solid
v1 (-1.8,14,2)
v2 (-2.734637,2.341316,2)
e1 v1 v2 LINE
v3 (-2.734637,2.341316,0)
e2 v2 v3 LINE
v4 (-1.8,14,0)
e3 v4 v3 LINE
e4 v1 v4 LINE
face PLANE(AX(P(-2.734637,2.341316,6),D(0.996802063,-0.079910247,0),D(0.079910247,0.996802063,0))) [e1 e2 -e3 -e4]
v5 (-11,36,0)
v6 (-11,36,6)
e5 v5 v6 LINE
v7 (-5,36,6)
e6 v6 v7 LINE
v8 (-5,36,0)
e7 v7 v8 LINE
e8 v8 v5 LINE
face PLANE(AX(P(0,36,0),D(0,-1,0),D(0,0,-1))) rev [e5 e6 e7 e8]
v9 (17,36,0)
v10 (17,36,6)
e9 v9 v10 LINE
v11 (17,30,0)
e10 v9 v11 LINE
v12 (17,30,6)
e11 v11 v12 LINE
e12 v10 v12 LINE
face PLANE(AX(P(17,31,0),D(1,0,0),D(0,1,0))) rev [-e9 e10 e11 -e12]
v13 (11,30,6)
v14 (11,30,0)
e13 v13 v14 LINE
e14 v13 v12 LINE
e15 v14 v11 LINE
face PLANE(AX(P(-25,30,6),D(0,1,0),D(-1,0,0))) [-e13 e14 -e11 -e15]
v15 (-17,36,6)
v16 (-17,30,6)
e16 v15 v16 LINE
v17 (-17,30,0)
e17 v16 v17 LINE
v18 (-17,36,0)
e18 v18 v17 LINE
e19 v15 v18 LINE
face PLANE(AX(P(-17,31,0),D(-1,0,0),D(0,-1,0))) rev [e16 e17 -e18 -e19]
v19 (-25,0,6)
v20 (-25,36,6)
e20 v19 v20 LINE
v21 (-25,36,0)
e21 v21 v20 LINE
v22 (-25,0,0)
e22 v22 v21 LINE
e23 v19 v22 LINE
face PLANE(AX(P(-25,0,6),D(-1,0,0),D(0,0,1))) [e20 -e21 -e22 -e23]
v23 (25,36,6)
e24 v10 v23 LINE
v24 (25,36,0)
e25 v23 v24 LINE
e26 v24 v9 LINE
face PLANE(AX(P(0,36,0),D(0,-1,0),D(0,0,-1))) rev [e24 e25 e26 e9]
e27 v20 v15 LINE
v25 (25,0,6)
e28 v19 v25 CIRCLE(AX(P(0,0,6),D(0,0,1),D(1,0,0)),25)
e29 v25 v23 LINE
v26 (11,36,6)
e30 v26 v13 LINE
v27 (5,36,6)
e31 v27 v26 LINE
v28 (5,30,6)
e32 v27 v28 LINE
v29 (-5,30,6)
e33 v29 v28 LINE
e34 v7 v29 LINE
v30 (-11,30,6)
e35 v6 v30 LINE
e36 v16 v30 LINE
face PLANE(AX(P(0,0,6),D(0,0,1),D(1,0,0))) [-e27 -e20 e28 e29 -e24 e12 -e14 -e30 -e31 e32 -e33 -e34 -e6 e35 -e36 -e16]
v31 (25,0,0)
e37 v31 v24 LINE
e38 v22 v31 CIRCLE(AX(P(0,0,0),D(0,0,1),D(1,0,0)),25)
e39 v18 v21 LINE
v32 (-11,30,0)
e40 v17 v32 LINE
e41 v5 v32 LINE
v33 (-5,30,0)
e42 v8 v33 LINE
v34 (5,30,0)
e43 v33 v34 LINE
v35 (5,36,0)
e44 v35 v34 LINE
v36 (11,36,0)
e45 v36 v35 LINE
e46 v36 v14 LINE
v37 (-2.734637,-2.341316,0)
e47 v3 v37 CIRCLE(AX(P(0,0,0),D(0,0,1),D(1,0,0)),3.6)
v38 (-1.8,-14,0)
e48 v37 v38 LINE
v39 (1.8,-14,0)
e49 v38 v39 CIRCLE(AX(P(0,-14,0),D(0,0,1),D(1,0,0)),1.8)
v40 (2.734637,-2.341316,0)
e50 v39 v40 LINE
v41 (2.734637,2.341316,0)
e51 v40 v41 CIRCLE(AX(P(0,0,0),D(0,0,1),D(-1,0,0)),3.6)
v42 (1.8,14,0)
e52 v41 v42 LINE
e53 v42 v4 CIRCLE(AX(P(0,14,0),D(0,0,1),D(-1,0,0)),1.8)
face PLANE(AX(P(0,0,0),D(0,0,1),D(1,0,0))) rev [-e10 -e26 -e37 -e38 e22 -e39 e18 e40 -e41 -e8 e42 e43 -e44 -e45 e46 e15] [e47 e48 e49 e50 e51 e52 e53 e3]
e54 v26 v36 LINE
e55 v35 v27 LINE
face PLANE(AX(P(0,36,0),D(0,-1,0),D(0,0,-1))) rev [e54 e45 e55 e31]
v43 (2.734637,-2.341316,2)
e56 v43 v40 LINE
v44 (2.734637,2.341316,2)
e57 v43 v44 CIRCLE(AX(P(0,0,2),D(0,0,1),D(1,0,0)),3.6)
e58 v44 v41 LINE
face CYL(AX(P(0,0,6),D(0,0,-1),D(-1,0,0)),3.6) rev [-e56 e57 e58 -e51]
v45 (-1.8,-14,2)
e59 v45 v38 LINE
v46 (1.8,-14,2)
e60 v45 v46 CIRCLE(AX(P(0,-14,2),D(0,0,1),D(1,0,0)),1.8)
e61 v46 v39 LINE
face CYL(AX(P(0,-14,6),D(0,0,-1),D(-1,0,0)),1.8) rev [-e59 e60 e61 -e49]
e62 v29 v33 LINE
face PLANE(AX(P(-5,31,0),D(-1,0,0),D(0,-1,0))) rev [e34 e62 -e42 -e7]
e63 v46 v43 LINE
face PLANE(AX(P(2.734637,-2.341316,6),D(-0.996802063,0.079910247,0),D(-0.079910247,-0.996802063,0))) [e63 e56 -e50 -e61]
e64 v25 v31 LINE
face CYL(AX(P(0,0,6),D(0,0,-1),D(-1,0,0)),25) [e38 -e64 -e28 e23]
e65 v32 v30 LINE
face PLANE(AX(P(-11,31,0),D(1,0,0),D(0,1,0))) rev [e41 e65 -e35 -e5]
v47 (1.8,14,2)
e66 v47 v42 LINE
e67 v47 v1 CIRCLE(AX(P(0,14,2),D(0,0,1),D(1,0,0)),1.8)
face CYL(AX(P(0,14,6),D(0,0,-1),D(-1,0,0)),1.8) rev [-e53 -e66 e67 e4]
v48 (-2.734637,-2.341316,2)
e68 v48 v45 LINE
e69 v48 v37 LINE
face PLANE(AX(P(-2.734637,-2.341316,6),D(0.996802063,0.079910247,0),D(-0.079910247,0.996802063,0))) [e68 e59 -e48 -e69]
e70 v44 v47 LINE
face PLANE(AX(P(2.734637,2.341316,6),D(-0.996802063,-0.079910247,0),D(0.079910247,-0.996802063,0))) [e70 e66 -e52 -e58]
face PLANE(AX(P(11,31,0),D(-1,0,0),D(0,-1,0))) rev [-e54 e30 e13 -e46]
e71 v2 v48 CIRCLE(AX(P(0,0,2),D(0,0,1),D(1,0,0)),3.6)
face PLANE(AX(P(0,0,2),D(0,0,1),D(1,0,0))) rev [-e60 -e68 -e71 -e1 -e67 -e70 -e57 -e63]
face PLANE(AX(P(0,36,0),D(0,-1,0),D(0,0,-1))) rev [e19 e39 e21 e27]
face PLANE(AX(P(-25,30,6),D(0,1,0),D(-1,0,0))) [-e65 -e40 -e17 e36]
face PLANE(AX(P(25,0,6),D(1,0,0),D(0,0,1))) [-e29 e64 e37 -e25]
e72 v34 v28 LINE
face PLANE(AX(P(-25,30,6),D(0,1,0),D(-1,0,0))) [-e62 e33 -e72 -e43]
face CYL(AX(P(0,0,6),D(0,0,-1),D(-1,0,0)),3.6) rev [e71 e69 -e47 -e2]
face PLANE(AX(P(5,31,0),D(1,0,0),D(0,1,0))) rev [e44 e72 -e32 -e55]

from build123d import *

# Parameters (mm, degrees)
SKETCH2_R                = 25
BOSS_EXTRUDE1_DEPTH      = 6
BOSS_EXTRUDE2_START      = -4
BOSS_EXTRUDE2_DEPTH      = 4
BOSS_EXTRUDE4_DEPTH      = 6
SKETCH5_W                = 8
SKETCH5_H                = 6
SKETCH5_W_2              = 6
BOSS_EXTRUDE5_DEPTH      = 6
MOVE_START               = 31
MOVE_FACE1_OUTLINE_W     = 8
MOVE_FACE1_OUTLINE_H     = 6
MOVE_FACE1_OUTLINE_W_2   = 6
MOVE_FACE1_DEPTH         = 5
MOVE_START_2             = 25
MOVE_FACE1_2_OUTLINE_W   = 6
MOVE_FACE1_2_OUTLINE_H   = 6
MOVE_FACE1_2_OUTLINE_W_2 = 10
MOVE_FACE1_2_DEPTH       = 5


# Read off the part's stored shape, not the designer's step: Move Face1
with BuildPart() as part:
    # Sketch2 → Boss-Extrude1 (new body)
    with BuildSketch(Plane.XY):
        Circle(SKETCH2_R)
        with BuildLine():
            Line((-2.73463726, -2.341315668), (-1.8, -14))
            ThreePointArc((-1.8, -14), (0, -15.8), (1.8, -14))
            Line((1.8, -14), (2.73463726, -2.341315668))
            ThreePointArc((2.73463726, -2.341315668), (3.6, 0), (2.73463726, 2.341315668))
            Line((2.73463726, 2.341315668), (1.8, 14))
            ThreePointArc((1.8, 14), (0, 15.8), (-1.8, 14))
            Line((-1.8, 14), (-2.73463726, 2.341315668))
            ThreePointArc((-2.73463726, 2.341315668), (-3.6, 0), (-2.73463726, -2.341315668))
        make_face(mode=Mode.SUBTRACT)
    extrude(amount=BOSS_EXTRUDE1_DEPTH)

    # Sketch3 → Boss-Extrude2 (add)
    with BuildSketch(Plane.XY.offset(6).offset(BOSS_EXTRUDE2_START)):
        with BuildLine():
            Line((2.73463726, 2.341315668), (1.8, 14))
            ThreePointArc((1.8, 14), (0, 15.8), (-1.8, 14))
            Line((-1.8, 14), (-2.73463726, 2.341315668))
            ThreePointArc((-2.73463726, 2.341315668), (-3.6, 0), (-2.73463726, -2.341315668))
            Line((-2.73463726, -2.341315668), (-1.8, -14))
            ThreePointArc((-1.8, -14), (0, -15.8), (1.8, -14))
            Line((1.8, -14), (2.73463726, -2.341315668))
            ThreePointArc((2.73463726, -2.341315668), (3.6, 0), (2.73463726, 2.341315668))
        make_face()
    extrude(amount=BOSS_EXTRUDE2_DEPTH)


with BuildPart() as body_2:
    # Sketch4 → Boss-Extrude4 (new body)
    with BuildSketch(Plane(origin=(0, 0, 0), x_dir=(-1, 0, 0), z_dir=(0, 0, -1))):
        with BuildLine():
            Line((25, 0), (25, 25))
            Line((25, 25), (0, 25))
            ThreePointArc((0, 25), (17.67766953, 17.67766953), (25, 0))
        make_face()
    extrude(amount=-BOSS_EXTRUDE4_DEPTH)


with BuildPart() as body_3:
    # Mirror1: mirrored copy
    add(body_2.part.mirror(Plane.ZY))


with BuildPart() as part_1:
    add(part.part)

    # Combine1: union body 2, body 3
    add(body_2.part)
    add(body_3.part)

    # Sketch5 → Boss-Extrude5 (add)
    with BuildSketch(Plane(origin=(0, 25, 0), x_dir=(1, 0, 0), z_dir=(0, 1, 0))):
        with Locations((21, -3)):
            Rectangle(SKETCH5_W, SKETCH5_H)
        with Locations((-8, -3)):
            Rectangle(SKETCH5_W_2, SKETCH5_H)
        with Locations((8, -3)):
            Rectangle(SKETCH5_W_2, SKETCH5_H)
        with Locations((-21, -3)):
            Rectangle(SKETCH5_W, SKETCH5_H)
    extrude(amount=BOSS_EXTRUDE5_DEPTH)

    # Move Face1 outline → Move Face1 (add)
    with BuildSketch(Plane(origin=(0, 0, 0), x_dir=(1, 0, 0), z_dir=(0, 1, 0)).offset(MOVE_START)):
        with Locations((-21, -3)):
            Rectangle(MOVE_FACE1_OUTLINE_W, MOVE_FACE1_OUTLINE_H)
        with Locations((-8, -3)):
            Rectangle(MOVE_FACE1_OUTLINE_W_2, MOVE_FACE1_OUTLINE_H)
        with Locations((8, -3)):
            Rectangle(MOVE_FACE1_OUTLINE_W_2, MOVE_FACE1_OUTLINE_H)
        with Locations((21, -3)):
            Rectangle(MOVE_FACE1_OUTLINE_W, MOVE_FACE1_OUTLINE_H)
    extrude(amount=MOVE_FACE1_DEPTH)

    # Move Face1 2 outline → Move Face1 2 (add)
    with BuildSketch(Plane(origin=(0, 0, 0), x_dir=(1, 0, 0), z_dir=(0, 1, 0)).offset(MOVE_START_2)):
        with Locations((-14, -3)):
            Rectangle(MOVE_FACE1_2_OUTLINE_W, MOVE_FACE1_2_OUTLINE_H)
        with Locations((0, -3)):
            Rectangle(MOVE_FACE1_2_OUTLINE_W_2, MOVE_FACE1_2_OUTLINE_H)
        with Locations((14, -3)):
            Rectangle(MOVE_FACE1_2_OUTLINE_W, MOVE_FACE1_2_OUTLINE_H)
    extrude(amount=MOVE_FACE1_2_DEPTH)


solid = part_1.part
